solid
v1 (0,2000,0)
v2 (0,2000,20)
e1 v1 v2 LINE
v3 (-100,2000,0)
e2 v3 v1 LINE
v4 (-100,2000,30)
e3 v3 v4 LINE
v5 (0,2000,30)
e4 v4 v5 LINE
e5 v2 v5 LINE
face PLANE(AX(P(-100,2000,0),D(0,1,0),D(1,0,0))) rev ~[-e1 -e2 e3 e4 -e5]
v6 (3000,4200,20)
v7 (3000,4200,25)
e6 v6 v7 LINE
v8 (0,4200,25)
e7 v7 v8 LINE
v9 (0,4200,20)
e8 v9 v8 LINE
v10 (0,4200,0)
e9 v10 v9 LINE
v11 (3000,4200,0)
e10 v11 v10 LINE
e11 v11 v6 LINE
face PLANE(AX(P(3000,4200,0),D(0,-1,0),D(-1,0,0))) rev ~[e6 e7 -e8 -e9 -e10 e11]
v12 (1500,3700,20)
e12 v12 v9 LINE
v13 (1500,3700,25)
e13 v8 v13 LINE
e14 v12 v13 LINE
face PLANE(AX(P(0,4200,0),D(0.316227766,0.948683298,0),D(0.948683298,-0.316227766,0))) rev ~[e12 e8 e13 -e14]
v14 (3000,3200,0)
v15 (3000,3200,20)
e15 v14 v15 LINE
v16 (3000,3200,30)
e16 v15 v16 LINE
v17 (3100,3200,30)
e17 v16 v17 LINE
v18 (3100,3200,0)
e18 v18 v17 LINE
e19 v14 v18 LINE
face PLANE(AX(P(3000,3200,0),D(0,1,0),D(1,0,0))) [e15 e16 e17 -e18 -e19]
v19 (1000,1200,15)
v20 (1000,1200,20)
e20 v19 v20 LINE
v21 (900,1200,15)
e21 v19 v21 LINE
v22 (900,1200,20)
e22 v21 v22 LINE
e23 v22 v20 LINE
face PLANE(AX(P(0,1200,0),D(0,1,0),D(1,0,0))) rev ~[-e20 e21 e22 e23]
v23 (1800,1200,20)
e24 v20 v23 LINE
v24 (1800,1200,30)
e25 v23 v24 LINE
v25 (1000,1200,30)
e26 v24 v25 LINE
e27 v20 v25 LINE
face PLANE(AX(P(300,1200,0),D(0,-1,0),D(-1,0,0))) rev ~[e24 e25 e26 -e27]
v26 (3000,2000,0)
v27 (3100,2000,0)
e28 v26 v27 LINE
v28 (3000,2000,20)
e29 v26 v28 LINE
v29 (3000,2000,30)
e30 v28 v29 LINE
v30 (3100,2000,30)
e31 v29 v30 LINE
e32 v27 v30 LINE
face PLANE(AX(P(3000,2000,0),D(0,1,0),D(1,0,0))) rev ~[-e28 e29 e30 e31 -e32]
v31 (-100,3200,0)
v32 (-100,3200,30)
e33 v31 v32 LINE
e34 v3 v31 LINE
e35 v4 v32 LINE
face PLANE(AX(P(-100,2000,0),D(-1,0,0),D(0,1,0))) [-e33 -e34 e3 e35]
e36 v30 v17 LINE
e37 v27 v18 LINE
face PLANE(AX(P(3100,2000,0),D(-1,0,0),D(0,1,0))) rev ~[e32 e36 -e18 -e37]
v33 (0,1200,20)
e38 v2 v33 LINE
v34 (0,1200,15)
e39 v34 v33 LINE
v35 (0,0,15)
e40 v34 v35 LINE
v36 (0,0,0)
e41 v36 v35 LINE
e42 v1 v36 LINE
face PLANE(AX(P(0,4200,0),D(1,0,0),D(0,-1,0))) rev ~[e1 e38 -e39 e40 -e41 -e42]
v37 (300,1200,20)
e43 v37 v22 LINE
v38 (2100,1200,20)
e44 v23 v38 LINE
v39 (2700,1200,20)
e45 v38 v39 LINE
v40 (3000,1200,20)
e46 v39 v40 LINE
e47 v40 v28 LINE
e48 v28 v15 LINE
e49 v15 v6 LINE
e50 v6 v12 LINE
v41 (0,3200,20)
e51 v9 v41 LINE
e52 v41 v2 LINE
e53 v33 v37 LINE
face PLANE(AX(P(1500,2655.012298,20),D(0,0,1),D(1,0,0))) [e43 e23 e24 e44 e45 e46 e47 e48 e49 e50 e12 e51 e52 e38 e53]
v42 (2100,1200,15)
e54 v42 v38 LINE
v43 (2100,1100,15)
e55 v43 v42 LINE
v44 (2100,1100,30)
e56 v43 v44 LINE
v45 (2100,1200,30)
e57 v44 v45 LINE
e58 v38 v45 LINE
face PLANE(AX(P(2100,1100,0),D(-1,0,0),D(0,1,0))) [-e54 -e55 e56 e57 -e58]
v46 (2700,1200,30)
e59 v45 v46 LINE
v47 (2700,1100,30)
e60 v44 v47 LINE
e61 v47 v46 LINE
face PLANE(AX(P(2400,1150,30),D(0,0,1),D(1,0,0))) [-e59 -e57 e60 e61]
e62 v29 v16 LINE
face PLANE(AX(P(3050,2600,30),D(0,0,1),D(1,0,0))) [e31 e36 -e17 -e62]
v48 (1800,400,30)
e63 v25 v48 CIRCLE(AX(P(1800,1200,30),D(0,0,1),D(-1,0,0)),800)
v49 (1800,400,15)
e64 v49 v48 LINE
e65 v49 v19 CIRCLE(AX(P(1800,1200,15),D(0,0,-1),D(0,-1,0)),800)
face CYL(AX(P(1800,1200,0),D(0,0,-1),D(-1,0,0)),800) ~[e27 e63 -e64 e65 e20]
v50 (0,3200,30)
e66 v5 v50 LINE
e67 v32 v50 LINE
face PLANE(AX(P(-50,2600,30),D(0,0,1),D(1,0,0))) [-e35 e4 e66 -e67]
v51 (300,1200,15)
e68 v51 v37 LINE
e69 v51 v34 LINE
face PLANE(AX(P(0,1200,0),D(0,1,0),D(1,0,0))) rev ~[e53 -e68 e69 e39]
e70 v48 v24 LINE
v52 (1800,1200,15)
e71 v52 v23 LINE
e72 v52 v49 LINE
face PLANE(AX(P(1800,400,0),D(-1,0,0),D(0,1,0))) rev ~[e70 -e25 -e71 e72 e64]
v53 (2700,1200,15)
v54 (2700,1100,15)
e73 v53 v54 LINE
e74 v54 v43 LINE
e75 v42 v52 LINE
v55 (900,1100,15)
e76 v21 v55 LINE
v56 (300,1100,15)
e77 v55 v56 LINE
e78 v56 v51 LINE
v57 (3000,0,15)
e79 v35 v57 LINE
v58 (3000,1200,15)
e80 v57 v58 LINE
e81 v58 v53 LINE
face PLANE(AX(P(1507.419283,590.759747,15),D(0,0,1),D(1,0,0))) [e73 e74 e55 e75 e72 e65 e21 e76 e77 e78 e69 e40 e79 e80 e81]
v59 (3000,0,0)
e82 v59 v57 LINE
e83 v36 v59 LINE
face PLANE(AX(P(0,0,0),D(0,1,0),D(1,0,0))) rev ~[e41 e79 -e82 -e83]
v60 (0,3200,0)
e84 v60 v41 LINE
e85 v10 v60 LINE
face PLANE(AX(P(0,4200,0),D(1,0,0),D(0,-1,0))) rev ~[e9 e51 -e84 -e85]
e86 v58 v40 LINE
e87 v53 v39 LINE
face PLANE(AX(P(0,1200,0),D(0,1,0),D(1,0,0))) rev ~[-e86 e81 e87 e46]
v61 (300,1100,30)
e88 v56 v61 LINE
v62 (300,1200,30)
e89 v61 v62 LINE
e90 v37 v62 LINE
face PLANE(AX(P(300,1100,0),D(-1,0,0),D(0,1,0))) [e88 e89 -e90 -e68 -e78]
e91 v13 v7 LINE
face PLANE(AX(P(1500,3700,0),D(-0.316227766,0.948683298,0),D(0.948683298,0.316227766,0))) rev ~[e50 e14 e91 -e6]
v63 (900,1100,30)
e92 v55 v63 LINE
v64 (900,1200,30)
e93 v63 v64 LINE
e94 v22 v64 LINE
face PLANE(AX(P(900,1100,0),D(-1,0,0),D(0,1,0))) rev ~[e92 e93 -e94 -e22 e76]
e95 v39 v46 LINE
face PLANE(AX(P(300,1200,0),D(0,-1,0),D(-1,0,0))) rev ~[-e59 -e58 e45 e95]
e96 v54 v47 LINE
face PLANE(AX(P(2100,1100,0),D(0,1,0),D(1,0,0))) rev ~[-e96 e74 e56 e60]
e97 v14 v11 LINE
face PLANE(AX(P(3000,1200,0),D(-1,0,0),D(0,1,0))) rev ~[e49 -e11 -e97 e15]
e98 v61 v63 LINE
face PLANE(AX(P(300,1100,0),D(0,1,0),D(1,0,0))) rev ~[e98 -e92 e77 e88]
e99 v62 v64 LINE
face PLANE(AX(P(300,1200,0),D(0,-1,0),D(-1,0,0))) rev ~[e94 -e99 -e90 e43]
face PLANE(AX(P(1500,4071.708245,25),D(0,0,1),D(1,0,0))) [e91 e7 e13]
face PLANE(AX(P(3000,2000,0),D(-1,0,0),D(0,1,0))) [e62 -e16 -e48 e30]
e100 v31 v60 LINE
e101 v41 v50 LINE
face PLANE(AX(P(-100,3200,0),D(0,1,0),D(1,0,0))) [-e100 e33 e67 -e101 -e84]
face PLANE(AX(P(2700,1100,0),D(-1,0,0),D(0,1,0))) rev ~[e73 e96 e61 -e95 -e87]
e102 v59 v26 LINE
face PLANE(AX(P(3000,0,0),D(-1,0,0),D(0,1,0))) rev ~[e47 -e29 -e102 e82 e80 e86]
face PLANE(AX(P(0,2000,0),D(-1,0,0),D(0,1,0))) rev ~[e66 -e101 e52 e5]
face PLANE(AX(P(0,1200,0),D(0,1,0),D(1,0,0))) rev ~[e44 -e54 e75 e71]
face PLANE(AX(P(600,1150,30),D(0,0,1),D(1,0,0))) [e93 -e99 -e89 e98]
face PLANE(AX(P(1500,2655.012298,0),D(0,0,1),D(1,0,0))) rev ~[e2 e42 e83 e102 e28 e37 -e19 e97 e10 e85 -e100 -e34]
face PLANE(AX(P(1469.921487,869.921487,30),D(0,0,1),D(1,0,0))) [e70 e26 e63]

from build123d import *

# Parameters (mm, degrees)
F1_DEPTH = 25
F0_W     = 100
F0_H     = 1200
F2_DEPTH = 30
F0_W_2   = 600
F0_H_2   = 100
F3_DEPTH = 30
F4_DEPTH = 15
F5_DEPTH = 20


# Not quite as in the source:
# - a feature names something its author has since deleted; it is built from what else it names


with BuildPart() as f1:
    # F0 (on Top) → F1 (new body)
    with BuildSketch(Plane.XY):
        Polygon((3000, 4200), (0, 4200), (1500, 3700), align=None)
    extrude(amount=F1_DEPTH)



with BuildPart() as f2:
    # F0 (on Top) → F2 (new body)
    with BuildSketch(Plane.XY):
        with Locations((-50, 2600)):
            Rectangle(F0_W, F0_H)
    extrude(amount=F2_DEPTH)


with BuildPart() as f2b:
    # F0 (on Top) → F2, piece 2 (new body)
    with BuildSketch(Plane.XY):
        with Locations((3050, 2600)):
            Rectangle(F0_W, F0_H)
    extrude(amount=F2_DEPTH)


with BuildPart() as f2c:
    # F0 (on Top) → F2, piece 3 (new body)
    with BuildSketch(Plane.XY):
        with Locations((2400, 1150)):
            Rectangle(F0_W_2, F0_H_2)
    extrude(amount=F2_DEPTH)



with BuildPart() as f2d:
    # F0 (on Top) → F2, piece 4 (new body)
    with BuildSketch(Plane.XY):
        with Locations((600, 1150)):
            Rectangle(F0_W_2, F0_H_2)
    extrude(amount=F2_DEPTH)


with BuildPart() as f3:
    # F0 (on Top) → F3 (new body)
    with BuildSketch(Plane.XY):
        with BuildLine():
            Line((1800, 1200), (1000, 1200))
            ThreePointArc((1000, 1200), (1234.3145750508, 634.3145750508), (1800, 400))
            Line((1800, 400), (1800, 1200))
        make_face()
    extrude(amount=F3_DEPTH)


with BuildPart() as f2c_1:
    add(f2c.part)

    add(f2d.part)  # F4 merges F2d

    add(f3.part)  # F4 merges F3
    # F0 (on Top) → F4 (join)
    with BuildSketch(Plane.XY):
        with BuildLine():
            Line((0, 1200), (0, 0))
            Line((0, 0), (3000, 0))
            Line((3000, 0), (3000, 1200))
            Line((3000, 1200), (2700, 1200))
            Line((2700, 1200), (2700, 1100))
            Line((2700, 1100), (2100, 1100))
            Line((2100, 1100), (2100, 1200))
            Line((2100, 1200), (1800, 1200))
            Line((1800, 1200), (1800, 400))
            ThreePointArc((1800, 400), (1234.3145750508, 634.3145750508), (1000, 1200))
            Line((1000, 1200), (900, 1200))
            Line((900, 1200), (900, 1100))
            Line((900, 1100), (300, 1100))
            Line((300, 1100), (300, 1200))
            Line((300, 1200), (0, 1200))
        make_face()
    extrude(amount=F4_DEPTH)


with BuildPart() as f1_1:
    add(f1.part)

    add(f2.part)  # F5 merges F2

    add(f2b.part)  # F5 merges F2b

    add(f2c_1.part)  # F5 merges F2c
    # F0 (on Top) → F5 (join)
    with BuildSketch(Plane.XY):
        Polygon((0, 2000), (0, 1200), (300, 1200), (900, 1200), (1000, 1200), (1800, 1200), (2100, 1200), (2700, 1200), (3000, 1200), (3000, 2000), (3000, 3200), (3000, 4200), (1500, 3700), (0, 4200), (0, 3200), align=None)
    extrude(amount=F5_DEPTH)


solid = f1_1.part
